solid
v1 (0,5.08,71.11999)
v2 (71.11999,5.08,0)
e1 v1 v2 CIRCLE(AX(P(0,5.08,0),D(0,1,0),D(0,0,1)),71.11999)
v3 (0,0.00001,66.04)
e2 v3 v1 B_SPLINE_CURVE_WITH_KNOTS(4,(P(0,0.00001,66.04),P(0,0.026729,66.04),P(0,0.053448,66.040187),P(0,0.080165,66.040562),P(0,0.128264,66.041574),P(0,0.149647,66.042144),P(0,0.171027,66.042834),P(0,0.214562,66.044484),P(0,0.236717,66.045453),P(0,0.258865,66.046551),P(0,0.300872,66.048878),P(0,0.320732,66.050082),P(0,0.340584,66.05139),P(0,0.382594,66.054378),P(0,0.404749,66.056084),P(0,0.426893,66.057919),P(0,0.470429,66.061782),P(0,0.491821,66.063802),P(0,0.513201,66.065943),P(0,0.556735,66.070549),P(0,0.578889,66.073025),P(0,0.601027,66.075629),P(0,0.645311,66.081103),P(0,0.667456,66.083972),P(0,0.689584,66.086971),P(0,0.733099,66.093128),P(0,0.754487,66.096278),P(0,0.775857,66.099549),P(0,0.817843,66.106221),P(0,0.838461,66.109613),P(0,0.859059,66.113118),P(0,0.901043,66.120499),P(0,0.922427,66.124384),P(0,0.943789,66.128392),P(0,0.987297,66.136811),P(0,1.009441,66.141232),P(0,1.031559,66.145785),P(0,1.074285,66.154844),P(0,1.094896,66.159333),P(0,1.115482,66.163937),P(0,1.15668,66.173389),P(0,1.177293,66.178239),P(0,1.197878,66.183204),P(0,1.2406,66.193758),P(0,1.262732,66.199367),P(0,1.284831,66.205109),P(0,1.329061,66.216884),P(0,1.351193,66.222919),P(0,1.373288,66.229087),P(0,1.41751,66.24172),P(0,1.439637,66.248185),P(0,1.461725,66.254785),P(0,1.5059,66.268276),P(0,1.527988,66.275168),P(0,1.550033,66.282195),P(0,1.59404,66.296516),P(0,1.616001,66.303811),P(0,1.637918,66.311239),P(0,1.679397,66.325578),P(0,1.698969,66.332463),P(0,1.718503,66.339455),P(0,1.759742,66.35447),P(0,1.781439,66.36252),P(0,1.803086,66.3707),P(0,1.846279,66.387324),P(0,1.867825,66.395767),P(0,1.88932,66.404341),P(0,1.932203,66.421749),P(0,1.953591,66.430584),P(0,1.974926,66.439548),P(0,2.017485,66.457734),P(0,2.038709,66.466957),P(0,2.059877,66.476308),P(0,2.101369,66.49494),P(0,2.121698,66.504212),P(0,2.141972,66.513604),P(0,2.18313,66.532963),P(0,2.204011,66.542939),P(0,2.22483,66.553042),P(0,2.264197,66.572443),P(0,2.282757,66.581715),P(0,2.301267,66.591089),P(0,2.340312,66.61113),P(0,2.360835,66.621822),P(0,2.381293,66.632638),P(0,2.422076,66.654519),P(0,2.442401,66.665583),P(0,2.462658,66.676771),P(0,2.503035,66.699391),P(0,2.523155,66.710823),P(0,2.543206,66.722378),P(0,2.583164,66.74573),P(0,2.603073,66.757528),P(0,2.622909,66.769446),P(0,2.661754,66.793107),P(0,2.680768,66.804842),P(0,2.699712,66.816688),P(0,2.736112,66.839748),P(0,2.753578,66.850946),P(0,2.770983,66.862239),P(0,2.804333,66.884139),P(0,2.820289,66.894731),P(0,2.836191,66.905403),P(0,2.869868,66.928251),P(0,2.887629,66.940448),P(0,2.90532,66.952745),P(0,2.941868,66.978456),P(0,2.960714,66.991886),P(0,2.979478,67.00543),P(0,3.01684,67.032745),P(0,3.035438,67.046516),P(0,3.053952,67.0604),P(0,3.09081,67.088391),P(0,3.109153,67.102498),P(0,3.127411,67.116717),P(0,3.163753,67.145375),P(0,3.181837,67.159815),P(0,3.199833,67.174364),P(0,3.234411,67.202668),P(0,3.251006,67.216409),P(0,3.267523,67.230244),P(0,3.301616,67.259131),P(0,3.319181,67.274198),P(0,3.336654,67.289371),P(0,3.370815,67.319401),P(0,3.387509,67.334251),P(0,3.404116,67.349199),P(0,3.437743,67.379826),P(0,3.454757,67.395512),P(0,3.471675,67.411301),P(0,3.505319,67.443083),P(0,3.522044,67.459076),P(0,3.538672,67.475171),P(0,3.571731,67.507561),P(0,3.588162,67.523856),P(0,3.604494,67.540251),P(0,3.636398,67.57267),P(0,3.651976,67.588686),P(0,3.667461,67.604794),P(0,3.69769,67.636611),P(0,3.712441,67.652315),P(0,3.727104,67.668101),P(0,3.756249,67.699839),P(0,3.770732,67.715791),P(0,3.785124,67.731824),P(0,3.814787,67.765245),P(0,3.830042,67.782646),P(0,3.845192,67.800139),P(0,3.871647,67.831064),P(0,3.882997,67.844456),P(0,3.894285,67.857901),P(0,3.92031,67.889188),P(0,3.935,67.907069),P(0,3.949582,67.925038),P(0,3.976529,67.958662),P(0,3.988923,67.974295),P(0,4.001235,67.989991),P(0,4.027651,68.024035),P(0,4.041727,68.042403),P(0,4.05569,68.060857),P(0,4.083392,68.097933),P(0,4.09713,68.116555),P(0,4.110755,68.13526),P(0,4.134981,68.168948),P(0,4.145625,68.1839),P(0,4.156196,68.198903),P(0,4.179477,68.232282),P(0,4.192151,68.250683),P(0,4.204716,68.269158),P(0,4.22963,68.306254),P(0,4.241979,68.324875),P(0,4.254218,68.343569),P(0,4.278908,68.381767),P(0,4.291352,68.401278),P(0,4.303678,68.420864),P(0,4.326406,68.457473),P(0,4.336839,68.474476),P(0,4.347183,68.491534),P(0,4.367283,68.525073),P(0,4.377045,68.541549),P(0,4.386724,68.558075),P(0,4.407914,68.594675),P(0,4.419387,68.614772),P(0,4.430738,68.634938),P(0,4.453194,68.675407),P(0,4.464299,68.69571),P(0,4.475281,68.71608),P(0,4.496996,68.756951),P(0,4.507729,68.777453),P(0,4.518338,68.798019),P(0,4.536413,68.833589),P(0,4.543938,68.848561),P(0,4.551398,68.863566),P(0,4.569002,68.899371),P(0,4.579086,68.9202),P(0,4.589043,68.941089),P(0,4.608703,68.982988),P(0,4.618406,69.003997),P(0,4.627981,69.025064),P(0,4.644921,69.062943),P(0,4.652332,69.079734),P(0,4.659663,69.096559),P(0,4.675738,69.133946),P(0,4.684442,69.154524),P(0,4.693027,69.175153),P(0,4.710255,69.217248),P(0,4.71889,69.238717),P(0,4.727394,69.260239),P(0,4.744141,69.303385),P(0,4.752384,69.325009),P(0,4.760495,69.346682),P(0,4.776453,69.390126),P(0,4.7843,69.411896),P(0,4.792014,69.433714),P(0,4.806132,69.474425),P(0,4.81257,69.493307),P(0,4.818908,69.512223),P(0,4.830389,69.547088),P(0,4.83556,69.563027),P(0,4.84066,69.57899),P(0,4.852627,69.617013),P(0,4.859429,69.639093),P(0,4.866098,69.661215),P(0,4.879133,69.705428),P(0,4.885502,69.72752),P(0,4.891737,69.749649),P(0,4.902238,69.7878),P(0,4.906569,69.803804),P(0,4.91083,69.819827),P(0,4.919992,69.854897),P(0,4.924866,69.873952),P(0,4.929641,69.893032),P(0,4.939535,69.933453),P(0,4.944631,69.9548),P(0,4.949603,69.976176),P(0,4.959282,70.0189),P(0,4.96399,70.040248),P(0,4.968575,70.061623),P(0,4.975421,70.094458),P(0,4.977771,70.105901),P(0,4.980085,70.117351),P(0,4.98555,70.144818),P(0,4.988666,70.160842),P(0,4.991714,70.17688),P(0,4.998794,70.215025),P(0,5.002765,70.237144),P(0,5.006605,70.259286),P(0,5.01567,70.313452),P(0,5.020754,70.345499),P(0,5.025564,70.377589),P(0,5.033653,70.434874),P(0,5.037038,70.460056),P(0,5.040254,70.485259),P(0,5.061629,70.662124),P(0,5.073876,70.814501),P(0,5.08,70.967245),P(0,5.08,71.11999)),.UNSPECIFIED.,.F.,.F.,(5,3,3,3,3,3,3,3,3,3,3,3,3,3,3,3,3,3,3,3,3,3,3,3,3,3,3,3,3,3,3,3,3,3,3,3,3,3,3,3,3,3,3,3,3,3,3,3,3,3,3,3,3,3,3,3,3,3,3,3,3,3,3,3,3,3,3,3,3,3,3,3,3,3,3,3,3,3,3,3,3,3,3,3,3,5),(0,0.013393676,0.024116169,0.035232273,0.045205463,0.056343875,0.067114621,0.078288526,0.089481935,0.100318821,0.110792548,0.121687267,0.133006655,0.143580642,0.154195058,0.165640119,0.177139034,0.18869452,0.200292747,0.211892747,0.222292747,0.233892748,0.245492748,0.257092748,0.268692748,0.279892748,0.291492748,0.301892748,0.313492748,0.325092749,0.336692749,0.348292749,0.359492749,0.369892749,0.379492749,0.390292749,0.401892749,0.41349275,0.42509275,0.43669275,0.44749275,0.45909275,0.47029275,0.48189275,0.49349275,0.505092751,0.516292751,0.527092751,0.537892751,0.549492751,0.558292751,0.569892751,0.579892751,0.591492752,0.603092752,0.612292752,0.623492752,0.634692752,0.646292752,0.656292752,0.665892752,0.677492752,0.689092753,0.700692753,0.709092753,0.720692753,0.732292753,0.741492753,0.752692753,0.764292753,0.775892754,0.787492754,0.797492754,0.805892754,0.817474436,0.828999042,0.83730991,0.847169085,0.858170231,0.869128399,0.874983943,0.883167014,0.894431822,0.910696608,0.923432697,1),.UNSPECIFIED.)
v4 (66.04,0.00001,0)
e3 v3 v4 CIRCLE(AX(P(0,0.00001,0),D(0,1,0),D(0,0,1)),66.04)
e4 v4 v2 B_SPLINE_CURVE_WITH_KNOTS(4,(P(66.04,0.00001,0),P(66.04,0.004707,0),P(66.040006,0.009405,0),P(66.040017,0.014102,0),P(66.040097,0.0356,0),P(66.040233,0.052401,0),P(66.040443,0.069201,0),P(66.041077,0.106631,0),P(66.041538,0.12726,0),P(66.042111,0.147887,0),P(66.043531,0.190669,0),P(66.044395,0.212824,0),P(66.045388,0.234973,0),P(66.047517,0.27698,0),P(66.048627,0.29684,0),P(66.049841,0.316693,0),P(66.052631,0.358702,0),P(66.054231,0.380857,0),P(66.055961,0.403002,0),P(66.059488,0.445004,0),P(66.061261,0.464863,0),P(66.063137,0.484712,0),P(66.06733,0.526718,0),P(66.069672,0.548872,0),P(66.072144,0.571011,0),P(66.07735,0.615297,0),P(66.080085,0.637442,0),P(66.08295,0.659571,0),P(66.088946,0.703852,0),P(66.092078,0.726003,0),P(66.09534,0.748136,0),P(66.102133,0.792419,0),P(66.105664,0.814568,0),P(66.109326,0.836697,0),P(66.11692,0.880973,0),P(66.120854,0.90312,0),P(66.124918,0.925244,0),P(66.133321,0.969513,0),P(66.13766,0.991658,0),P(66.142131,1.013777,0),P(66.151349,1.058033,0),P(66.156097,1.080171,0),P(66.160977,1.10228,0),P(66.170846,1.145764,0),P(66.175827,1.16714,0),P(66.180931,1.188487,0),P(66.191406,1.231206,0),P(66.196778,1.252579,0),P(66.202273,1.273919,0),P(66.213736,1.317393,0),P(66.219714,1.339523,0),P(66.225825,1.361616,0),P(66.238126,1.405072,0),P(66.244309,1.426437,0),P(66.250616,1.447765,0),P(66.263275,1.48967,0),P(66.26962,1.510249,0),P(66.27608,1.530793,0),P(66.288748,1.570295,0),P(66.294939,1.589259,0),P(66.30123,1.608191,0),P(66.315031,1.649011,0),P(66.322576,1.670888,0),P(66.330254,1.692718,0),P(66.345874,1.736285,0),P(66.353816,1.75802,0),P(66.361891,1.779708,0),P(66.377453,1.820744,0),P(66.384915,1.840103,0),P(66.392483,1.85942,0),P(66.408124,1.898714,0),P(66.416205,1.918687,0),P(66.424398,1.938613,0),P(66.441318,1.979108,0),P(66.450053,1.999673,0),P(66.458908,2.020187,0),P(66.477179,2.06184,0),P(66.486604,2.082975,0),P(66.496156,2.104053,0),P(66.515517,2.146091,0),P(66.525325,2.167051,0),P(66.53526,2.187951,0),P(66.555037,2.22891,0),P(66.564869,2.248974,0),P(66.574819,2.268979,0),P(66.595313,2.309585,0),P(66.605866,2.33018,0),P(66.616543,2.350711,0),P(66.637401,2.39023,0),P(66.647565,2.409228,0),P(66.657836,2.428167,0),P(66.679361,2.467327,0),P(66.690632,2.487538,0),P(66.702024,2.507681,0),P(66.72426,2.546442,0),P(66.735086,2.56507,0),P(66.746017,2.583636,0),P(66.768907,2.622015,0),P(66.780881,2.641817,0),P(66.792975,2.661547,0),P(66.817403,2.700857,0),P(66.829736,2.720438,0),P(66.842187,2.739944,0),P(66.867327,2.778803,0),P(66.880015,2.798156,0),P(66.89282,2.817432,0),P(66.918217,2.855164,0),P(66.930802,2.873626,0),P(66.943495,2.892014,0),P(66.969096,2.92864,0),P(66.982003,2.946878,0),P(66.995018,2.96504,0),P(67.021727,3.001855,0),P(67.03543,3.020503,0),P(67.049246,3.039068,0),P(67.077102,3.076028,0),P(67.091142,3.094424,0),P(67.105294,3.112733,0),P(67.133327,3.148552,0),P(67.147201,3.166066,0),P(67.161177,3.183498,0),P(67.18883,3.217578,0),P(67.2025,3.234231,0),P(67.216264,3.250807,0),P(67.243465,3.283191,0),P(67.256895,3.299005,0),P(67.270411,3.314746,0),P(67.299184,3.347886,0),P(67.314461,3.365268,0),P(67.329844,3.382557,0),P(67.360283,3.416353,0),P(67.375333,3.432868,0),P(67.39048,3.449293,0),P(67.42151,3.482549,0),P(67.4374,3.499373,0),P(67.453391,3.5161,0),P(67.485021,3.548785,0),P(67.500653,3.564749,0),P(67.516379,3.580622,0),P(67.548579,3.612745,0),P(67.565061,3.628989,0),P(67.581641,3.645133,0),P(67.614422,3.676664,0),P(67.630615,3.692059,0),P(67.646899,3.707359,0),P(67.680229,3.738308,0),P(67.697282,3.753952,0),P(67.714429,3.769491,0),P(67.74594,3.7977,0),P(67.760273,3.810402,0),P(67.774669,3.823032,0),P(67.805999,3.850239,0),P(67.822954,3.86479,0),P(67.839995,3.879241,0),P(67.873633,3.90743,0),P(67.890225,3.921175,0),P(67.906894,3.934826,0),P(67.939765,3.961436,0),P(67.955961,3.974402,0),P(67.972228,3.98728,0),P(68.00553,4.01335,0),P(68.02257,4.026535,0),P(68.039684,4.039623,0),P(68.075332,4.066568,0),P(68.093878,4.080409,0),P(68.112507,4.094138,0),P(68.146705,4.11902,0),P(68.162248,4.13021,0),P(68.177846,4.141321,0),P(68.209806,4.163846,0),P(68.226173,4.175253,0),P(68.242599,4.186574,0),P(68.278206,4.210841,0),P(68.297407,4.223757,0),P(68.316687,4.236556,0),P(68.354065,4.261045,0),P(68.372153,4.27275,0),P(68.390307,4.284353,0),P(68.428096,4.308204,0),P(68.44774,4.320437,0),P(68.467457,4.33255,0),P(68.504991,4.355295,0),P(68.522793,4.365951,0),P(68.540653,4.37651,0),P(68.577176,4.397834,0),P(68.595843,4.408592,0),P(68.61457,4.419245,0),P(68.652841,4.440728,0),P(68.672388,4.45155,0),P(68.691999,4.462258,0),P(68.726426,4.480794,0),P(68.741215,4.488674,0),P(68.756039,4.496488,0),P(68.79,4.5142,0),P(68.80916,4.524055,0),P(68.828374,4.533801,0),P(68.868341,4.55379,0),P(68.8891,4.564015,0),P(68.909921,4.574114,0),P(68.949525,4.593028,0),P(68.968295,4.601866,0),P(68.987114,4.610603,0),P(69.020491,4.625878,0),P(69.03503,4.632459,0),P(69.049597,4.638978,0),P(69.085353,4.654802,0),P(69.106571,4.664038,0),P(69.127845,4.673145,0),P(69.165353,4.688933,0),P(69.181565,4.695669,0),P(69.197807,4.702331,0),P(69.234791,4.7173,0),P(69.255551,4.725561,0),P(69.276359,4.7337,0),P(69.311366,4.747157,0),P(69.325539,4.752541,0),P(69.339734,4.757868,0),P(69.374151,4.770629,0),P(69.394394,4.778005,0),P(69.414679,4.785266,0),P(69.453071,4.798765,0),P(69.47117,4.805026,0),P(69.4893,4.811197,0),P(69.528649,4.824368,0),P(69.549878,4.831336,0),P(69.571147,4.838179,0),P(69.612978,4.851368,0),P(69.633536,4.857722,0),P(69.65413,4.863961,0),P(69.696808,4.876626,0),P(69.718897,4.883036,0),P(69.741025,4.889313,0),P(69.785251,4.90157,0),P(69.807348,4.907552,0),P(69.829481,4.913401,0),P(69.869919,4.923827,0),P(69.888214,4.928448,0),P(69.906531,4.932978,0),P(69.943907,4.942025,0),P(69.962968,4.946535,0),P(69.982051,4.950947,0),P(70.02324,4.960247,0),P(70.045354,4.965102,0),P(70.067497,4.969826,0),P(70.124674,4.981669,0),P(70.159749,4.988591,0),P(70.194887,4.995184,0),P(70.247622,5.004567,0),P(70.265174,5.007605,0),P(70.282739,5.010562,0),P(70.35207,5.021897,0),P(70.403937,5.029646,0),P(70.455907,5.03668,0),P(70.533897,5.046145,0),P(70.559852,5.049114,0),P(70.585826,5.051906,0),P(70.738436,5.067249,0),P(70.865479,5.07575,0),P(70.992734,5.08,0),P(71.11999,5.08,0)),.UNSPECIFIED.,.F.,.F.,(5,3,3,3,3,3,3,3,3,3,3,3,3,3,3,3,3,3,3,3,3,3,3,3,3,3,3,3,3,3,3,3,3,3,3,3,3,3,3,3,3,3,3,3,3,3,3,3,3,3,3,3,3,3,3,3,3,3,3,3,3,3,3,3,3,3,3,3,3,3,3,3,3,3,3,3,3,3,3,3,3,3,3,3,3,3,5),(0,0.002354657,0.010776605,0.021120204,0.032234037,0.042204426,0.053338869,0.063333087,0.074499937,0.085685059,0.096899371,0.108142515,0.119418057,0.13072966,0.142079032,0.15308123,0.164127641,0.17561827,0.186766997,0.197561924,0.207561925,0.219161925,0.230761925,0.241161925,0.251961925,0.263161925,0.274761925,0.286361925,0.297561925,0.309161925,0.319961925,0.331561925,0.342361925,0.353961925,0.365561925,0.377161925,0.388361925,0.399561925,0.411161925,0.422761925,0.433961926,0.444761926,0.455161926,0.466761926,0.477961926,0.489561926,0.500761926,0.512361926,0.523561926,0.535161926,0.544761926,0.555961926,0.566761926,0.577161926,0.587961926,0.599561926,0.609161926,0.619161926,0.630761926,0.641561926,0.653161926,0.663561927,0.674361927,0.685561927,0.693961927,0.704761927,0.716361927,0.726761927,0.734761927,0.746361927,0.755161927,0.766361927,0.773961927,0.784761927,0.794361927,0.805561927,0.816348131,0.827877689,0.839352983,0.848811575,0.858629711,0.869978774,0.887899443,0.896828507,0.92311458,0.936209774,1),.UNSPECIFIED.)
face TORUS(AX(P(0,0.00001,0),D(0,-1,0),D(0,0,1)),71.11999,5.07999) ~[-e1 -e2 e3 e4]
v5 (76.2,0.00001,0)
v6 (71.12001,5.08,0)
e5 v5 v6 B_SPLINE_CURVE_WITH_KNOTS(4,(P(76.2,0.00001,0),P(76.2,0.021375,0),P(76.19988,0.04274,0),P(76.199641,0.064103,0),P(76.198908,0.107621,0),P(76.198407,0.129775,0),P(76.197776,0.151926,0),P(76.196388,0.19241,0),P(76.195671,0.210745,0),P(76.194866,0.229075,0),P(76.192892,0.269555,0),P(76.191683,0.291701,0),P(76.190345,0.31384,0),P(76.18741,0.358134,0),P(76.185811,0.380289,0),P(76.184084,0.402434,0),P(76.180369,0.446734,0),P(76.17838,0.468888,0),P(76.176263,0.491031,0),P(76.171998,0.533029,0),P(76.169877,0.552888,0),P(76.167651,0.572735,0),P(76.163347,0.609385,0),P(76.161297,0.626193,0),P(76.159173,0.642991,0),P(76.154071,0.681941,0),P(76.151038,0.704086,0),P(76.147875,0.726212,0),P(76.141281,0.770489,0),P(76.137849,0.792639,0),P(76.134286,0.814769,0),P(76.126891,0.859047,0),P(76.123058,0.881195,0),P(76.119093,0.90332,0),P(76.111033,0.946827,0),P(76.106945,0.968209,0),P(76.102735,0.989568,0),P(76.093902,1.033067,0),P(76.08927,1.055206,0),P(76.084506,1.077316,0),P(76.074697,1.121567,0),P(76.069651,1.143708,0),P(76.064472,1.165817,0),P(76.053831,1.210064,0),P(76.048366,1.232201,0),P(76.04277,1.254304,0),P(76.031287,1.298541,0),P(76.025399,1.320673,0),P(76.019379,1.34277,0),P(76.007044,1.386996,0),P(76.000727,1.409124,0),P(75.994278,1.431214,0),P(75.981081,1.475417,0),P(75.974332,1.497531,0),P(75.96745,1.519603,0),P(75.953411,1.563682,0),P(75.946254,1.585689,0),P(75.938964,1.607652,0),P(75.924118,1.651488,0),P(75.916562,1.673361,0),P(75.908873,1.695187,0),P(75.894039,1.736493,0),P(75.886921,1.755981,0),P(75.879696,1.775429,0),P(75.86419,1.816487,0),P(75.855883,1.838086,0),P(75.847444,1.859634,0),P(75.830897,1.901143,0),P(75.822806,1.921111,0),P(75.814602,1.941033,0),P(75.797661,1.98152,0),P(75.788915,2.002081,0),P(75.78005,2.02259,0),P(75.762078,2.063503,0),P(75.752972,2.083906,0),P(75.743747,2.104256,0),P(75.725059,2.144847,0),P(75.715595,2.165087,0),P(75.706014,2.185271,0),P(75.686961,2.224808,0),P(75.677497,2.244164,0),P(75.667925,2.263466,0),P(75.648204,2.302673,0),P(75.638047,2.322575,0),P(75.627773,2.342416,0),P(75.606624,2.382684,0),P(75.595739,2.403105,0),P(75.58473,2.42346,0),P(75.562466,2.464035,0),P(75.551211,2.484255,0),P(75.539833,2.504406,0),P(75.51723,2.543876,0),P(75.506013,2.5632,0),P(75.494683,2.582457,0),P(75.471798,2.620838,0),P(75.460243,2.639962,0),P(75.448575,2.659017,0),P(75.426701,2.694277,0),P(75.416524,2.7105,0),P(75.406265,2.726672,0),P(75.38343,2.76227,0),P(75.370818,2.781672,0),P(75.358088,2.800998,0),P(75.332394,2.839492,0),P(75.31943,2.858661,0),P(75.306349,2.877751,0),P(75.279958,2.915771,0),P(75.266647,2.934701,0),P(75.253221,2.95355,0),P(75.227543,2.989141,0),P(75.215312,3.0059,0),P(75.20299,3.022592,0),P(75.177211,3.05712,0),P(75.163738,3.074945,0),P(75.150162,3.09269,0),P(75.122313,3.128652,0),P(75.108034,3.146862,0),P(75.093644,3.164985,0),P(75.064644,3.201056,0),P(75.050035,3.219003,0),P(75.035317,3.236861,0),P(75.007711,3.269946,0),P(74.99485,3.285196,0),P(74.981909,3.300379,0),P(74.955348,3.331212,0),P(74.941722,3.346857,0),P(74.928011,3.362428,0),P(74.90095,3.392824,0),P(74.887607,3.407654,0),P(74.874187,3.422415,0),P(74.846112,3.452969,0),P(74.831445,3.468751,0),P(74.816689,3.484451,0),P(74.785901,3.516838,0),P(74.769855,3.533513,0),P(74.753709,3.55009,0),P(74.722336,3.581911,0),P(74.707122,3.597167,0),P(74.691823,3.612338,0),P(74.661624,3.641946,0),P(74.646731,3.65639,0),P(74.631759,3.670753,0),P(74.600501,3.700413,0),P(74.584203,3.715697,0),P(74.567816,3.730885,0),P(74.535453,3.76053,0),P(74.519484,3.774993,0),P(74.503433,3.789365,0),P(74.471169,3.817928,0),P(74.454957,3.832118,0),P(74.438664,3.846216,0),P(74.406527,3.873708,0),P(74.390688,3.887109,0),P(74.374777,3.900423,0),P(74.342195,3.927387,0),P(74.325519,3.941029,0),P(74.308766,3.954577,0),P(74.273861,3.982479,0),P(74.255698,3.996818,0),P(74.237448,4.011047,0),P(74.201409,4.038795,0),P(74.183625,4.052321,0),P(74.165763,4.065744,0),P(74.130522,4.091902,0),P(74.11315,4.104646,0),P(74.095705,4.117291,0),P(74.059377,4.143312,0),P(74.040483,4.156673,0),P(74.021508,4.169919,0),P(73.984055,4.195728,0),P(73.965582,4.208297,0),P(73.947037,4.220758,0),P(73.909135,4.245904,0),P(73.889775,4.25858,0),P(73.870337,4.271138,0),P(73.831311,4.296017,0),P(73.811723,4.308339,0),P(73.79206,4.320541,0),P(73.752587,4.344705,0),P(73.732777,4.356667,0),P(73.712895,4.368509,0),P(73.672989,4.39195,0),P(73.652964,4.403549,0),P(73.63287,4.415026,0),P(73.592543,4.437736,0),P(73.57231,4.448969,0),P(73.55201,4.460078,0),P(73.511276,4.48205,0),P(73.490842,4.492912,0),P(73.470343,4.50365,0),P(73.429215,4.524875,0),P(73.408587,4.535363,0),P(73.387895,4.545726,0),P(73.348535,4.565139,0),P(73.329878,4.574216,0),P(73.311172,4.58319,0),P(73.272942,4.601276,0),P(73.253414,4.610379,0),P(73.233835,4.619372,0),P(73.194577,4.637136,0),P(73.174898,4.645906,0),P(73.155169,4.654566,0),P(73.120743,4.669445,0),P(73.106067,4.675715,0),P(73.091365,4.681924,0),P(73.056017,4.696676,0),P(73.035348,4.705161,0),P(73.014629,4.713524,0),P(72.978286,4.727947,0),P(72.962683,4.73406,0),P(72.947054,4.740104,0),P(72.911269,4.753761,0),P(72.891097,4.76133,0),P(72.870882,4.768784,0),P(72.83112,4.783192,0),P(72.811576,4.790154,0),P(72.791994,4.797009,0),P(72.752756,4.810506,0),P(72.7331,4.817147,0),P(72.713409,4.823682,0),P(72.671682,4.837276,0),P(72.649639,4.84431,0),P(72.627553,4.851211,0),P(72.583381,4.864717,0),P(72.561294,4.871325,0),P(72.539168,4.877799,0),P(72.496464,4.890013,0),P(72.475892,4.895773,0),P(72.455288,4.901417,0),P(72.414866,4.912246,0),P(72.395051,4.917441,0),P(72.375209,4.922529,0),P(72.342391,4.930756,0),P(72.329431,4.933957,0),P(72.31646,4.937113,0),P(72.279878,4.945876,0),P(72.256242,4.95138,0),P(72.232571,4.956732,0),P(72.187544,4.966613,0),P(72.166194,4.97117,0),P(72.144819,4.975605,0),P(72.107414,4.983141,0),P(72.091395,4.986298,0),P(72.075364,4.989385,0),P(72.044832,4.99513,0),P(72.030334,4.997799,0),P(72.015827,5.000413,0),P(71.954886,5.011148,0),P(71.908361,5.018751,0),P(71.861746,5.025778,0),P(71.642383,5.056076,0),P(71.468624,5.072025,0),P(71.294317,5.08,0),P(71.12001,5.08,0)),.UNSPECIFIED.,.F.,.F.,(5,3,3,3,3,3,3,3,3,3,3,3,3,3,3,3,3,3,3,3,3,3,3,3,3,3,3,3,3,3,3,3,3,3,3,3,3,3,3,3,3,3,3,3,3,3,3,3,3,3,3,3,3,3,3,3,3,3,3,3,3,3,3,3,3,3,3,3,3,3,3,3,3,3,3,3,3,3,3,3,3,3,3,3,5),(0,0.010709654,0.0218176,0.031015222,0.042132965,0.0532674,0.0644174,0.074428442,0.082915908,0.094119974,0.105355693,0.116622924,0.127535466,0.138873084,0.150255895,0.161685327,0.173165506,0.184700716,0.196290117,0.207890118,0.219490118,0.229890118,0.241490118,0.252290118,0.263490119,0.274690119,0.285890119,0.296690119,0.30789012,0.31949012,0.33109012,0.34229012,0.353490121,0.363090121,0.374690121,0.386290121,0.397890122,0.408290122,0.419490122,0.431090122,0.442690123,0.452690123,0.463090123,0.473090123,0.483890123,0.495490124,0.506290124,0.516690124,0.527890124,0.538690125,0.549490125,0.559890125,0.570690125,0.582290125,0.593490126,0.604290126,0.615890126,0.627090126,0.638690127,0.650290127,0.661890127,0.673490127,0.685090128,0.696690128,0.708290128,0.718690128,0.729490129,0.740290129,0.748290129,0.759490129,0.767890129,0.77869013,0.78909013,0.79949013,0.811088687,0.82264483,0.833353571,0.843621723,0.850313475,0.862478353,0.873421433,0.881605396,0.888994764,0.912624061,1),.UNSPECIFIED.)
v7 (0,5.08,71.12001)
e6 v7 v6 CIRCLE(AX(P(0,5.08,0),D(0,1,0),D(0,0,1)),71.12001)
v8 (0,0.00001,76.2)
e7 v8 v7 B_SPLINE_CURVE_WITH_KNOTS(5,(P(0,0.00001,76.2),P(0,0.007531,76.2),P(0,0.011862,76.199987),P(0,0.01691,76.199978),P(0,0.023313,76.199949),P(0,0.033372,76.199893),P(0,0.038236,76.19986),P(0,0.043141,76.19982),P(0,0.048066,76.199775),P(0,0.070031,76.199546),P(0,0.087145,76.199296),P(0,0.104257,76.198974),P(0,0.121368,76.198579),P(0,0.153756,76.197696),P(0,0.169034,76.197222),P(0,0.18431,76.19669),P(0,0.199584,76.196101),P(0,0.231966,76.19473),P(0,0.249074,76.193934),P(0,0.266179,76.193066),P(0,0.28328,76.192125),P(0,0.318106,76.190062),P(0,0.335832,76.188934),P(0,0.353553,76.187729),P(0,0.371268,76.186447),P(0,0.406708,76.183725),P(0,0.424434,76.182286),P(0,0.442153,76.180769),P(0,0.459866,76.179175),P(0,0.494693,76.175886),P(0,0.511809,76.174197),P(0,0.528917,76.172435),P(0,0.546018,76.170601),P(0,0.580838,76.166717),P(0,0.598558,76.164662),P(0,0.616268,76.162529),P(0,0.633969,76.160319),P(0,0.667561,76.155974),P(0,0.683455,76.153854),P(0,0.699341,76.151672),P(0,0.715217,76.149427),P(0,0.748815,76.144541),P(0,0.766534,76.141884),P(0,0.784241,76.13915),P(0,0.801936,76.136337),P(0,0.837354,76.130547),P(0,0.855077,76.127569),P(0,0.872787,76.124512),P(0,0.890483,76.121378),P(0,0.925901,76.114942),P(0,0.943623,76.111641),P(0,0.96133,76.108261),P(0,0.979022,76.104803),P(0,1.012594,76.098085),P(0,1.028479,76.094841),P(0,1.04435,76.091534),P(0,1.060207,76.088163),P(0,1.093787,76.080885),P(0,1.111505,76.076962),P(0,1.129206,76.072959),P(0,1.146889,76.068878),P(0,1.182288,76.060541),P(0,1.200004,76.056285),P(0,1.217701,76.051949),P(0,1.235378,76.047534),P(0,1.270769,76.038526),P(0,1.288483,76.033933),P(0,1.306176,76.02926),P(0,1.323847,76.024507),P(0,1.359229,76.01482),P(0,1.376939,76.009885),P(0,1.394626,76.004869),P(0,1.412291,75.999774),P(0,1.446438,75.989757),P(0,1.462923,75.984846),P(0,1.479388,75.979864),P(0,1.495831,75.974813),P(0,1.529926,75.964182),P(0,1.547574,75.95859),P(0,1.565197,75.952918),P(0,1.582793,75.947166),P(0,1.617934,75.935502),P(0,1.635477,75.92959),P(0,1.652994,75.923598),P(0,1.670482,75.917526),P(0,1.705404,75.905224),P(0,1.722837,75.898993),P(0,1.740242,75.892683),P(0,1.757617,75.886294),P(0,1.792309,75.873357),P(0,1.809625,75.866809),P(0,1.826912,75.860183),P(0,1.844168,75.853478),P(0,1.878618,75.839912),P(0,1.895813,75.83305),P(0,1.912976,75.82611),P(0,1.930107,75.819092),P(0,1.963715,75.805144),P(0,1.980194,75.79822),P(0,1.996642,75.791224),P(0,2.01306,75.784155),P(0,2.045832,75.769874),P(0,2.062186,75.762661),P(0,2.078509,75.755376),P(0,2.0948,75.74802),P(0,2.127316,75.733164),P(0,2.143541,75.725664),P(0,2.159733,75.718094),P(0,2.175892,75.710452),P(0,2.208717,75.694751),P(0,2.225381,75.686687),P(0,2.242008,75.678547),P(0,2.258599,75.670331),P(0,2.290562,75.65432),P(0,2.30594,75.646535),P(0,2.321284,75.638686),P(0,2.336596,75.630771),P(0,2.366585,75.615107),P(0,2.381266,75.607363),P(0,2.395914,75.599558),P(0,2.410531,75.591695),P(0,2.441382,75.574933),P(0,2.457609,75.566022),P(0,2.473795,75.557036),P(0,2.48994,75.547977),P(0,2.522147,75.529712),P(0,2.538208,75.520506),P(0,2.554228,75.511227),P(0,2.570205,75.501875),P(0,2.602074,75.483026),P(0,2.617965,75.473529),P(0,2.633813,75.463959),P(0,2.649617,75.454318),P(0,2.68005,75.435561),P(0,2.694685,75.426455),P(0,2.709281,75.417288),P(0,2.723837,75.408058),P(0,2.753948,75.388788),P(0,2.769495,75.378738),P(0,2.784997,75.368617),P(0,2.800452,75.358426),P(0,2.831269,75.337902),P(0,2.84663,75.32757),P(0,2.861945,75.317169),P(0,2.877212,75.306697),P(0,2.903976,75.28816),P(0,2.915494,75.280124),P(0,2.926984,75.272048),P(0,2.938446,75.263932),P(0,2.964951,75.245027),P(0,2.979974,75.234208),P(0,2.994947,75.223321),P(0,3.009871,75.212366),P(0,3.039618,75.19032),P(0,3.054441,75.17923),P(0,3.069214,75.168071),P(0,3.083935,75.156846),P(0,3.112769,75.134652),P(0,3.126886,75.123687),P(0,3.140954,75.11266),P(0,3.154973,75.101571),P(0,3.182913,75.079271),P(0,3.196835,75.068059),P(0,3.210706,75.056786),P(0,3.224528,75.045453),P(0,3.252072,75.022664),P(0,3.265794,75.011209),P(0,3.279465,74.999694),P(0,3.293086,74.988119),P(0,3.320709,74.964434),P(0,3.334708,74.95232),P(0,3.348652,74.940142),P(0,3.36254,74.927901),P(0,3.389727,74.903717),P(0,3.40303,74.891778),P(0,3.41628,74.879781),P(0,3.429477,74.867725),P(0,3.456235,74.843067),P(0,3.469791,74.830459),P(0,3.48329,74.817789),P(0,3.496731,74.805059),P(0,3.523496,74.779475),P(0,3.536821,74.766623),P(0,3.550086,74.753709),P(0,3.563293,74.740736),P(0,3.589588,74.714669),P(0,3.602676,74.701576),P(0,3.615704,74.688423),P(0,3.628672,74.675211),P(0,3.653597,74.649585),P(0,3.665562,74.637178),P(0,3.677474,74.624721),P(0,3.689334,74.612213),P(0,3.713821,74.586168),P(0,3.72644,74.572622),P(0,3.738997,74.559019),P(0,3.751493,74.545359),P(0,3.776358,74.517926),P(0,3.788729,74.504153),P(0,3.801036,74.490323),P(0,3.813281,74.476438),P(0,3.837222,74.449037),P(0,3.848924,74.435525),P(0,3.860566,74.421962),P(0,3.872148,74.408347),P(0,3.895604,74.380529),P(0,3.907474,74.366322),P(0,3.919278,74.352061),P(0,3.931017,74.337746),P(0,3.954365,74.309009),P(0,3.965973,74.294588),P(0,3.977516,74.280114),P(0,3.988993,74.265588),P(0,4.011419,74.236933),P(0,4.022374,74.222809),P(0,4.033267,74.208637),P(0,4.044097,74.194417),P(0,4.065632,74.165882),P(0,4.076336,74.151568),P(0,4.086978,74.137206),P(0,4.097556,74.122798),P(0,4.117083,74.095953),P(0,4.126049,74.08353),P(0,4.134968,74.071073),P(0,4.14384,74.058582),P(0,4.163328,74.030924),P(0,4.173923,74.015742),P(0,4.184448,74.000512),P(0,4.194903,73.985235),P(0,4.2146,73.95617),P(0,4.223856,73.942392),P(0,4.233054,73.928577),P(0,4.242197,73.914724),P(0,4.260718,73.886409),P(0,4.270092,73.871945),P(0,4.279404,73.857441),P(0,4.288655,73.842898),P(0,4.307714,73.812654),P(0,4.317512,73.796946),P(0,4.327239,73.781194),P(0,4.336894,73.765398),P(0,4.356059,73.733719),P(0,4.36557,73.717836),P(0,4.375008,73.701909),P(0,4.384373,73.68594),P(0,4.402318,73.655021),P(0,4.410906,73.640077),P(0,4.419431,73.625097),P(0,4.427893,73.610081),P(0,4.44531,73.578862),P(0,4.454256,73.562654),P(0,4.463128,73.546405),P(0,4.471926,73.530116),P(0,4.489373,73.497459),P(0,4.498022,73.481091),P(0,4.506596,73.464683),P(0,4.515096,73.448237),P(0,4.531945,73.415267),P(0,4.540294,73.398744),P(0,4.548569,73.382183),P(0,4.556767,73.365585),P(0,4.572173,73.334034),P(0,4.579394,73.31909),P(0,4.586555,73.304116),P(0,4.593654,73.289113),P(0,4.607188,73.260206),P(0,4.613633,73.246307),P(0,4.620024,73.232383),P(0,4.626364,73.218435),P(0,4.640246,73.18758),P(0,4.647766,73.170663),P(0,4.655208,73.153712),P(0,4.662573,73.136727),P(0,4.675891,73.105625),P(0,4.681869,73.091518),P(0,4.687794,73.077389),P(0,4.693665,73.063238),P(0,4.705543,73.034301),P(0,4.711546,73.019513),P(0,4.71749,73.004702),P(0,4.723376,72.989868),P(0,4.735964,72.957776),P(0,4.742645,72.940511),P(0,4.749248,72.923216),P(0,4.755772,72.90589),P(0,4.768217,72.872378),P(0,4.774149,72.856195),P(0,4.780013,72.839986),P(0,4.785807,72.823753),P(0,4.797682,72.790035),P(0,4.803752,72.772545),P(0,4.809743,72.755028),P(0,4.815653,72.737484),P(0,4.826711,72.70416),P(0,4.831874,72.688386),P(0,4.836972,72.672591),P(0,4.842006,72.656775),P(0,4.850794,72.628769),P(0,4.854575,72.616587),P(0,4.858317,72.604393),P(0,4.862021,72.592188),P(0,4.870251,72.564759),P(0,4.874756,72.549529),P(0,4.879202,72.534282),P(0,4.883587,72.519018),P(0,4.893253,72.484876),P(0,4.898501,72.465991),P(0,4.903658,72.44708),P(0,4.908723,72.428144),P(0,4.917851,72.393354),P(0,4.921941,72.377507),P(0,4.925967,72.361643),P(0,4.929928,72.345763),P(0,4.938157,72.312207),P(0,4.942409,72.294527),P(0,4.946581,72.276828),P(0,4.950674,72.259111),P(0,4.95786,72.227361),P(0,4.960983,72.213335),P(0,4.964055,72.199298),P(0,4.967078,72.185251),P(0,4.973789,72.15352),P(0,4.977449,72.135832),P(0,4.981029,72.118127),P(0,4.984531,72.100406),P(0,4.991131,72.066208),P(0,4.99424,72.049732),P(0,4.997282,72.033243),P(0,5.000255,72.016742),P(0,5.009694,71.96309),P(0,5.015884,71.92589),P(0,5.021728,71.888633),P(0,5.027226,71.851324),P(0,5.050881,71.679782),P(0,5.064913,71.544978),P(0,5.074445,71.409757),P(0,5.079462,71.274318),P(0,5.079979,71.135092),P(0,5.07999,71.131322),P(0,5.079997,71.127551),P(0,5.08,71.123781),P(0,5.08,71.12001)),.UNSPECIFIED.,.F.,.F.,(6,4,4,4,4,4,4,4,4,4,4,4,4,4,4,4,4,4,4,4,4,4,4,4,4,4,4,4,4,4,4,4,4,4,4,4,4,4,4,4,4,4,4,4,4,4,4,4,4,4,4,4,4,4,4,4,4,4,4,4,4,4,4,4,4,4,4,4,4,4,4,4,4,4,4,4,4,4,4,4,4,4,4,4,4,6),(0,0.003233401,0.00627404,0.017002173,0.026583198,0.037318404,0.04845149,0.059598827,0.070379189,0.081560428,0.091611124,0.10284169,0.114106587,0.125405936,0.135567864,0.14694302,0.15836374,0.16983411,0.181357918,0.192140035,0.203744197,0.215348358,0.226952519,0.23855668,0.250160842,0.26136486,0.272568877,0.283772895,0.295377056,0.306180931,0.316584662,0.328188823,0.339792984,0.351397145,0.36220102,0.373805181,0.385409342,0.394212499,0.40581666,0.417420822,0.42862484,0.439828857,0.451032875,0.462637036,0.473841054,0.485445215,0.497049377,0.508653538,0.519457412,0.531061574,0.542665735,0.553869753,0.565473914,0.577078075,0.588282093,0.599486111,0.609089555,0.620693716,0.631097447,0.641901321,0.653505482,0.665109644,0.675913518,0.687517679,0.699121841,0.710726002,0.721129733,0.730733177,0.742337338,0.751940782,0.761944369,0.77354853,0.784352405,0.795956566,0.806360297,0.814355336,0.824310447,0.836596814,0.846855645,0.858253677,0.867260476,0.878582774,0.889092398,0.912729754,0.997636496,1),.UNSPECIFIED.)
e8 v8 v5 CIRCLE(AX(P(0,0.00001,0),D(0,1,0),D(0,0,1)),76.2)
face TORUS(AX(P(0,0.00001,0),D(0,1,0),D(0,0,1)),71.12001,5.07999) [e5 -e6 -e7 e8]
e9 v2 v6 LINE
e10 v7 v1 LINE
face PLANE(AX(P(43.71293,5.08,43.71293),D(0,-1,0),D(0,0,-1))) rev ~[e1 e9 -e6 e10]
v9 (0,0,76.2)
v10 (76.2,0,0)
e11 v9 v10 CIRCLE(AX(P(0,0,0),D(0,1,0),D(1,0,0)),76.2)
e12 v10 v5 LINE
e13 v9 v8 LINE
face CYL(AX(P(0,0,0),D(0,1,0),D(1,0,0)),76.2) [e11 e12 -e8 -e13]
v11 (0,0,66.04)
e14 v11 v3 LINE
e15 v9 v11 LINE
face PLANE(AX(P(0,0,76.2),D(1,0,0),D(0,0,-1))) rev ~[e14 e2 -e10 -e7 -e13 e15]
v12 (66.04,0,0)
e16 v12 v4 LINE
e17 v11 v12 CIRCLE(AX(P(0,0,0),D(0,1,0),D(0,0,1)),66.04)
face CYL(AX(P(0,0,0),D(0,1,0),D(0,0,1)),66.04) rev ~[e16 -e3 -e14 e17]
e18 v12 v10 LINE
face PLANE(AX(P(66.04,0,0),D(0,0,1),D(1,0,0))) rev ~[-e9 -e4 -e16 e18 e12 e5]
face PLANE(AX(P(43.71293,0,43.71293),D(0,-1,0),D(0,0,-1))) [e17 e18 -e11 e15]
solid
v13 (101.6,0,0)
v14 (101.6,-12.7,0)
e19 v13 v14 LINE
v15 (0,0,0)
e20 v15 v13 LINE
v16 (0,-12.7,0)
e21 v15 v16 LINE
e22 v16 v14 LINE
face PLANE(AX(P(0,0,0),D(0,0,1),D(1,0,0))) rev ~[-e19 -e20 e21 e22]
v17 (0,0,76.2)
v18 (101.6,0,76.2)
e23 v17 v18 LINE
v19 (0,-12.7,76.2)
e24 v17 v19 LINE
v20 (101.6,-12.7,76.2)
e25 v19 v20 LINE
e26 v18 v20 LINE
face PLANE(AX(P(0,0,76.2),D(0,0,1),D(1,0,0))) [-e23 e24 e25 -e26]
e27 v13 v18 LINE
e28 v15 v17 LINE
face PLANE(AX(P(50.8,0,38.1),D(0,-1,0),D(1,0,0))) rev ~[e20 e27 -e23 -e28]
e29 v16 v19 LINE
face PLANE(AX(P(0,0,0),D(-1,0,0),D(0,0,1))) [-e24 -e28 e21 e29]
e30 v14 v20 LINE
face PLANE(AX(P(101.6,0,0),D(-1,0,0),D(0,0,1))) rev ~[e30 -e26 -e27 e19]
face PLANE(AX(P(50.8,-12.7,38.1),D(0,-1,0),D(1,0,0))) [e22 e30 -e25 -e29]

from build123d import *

# Parameters (mm, degrees)
F0_W     = 101.6
F0_H     = 76.2
F1_DEPTH = 12.7
F5_R     = 5.07999


# Not quite as in the source:
# - a fillet or chamfer is up to 0.001 mm smaller than in the source, because OpenCascade refuses the exact size


with BuildPart() as f1:
    # F0 (on Front) → F1 (new body)
    with BuildSketch(Plane.XZ):
        with Locations((50.8, 38.1)):
            Rectangle(F0_W, F0_H)
    extrude(amount=F1_DEPTH)


with BuildPart() as f4:
    # F4: sweep along a path in F3
    with BuildLine(Plane.XY) as f4_path:
        Line((13.2644446979, 0), (13.2644446979, 5.08))
    # F2 (on Front) → F4 (sweep)
    with BuildSketch(Plane.XZ):
        with BuildLine():
            ThreePointArc((0, 66.04), (46.6973318296, 46.6973318296), (66.04, 0))
            Line((66.04, 0), (76.2, 0))
            ThreePointArc((76.2, 0), (53.8815367264, 53.8815367264), (0, 76.2))
            Line((0, 76.2), (0, 66.04))
        make_face()
    sweep(path=f4_path.line)

    # F5 (radius 5.08 in the source; OpenCascade refuses exactly that, so slightly less here)
    f5_edges = [f4.edges().sort_by_distance(p)[0] for p in [
        (46.697332, 5.08, 46.697332),
        (53.881537, 5.08, 53.881537),
    ]]
    fillet(f5_edges, radius=F5_R)


solid = Compound([f1.part, f4.part])
